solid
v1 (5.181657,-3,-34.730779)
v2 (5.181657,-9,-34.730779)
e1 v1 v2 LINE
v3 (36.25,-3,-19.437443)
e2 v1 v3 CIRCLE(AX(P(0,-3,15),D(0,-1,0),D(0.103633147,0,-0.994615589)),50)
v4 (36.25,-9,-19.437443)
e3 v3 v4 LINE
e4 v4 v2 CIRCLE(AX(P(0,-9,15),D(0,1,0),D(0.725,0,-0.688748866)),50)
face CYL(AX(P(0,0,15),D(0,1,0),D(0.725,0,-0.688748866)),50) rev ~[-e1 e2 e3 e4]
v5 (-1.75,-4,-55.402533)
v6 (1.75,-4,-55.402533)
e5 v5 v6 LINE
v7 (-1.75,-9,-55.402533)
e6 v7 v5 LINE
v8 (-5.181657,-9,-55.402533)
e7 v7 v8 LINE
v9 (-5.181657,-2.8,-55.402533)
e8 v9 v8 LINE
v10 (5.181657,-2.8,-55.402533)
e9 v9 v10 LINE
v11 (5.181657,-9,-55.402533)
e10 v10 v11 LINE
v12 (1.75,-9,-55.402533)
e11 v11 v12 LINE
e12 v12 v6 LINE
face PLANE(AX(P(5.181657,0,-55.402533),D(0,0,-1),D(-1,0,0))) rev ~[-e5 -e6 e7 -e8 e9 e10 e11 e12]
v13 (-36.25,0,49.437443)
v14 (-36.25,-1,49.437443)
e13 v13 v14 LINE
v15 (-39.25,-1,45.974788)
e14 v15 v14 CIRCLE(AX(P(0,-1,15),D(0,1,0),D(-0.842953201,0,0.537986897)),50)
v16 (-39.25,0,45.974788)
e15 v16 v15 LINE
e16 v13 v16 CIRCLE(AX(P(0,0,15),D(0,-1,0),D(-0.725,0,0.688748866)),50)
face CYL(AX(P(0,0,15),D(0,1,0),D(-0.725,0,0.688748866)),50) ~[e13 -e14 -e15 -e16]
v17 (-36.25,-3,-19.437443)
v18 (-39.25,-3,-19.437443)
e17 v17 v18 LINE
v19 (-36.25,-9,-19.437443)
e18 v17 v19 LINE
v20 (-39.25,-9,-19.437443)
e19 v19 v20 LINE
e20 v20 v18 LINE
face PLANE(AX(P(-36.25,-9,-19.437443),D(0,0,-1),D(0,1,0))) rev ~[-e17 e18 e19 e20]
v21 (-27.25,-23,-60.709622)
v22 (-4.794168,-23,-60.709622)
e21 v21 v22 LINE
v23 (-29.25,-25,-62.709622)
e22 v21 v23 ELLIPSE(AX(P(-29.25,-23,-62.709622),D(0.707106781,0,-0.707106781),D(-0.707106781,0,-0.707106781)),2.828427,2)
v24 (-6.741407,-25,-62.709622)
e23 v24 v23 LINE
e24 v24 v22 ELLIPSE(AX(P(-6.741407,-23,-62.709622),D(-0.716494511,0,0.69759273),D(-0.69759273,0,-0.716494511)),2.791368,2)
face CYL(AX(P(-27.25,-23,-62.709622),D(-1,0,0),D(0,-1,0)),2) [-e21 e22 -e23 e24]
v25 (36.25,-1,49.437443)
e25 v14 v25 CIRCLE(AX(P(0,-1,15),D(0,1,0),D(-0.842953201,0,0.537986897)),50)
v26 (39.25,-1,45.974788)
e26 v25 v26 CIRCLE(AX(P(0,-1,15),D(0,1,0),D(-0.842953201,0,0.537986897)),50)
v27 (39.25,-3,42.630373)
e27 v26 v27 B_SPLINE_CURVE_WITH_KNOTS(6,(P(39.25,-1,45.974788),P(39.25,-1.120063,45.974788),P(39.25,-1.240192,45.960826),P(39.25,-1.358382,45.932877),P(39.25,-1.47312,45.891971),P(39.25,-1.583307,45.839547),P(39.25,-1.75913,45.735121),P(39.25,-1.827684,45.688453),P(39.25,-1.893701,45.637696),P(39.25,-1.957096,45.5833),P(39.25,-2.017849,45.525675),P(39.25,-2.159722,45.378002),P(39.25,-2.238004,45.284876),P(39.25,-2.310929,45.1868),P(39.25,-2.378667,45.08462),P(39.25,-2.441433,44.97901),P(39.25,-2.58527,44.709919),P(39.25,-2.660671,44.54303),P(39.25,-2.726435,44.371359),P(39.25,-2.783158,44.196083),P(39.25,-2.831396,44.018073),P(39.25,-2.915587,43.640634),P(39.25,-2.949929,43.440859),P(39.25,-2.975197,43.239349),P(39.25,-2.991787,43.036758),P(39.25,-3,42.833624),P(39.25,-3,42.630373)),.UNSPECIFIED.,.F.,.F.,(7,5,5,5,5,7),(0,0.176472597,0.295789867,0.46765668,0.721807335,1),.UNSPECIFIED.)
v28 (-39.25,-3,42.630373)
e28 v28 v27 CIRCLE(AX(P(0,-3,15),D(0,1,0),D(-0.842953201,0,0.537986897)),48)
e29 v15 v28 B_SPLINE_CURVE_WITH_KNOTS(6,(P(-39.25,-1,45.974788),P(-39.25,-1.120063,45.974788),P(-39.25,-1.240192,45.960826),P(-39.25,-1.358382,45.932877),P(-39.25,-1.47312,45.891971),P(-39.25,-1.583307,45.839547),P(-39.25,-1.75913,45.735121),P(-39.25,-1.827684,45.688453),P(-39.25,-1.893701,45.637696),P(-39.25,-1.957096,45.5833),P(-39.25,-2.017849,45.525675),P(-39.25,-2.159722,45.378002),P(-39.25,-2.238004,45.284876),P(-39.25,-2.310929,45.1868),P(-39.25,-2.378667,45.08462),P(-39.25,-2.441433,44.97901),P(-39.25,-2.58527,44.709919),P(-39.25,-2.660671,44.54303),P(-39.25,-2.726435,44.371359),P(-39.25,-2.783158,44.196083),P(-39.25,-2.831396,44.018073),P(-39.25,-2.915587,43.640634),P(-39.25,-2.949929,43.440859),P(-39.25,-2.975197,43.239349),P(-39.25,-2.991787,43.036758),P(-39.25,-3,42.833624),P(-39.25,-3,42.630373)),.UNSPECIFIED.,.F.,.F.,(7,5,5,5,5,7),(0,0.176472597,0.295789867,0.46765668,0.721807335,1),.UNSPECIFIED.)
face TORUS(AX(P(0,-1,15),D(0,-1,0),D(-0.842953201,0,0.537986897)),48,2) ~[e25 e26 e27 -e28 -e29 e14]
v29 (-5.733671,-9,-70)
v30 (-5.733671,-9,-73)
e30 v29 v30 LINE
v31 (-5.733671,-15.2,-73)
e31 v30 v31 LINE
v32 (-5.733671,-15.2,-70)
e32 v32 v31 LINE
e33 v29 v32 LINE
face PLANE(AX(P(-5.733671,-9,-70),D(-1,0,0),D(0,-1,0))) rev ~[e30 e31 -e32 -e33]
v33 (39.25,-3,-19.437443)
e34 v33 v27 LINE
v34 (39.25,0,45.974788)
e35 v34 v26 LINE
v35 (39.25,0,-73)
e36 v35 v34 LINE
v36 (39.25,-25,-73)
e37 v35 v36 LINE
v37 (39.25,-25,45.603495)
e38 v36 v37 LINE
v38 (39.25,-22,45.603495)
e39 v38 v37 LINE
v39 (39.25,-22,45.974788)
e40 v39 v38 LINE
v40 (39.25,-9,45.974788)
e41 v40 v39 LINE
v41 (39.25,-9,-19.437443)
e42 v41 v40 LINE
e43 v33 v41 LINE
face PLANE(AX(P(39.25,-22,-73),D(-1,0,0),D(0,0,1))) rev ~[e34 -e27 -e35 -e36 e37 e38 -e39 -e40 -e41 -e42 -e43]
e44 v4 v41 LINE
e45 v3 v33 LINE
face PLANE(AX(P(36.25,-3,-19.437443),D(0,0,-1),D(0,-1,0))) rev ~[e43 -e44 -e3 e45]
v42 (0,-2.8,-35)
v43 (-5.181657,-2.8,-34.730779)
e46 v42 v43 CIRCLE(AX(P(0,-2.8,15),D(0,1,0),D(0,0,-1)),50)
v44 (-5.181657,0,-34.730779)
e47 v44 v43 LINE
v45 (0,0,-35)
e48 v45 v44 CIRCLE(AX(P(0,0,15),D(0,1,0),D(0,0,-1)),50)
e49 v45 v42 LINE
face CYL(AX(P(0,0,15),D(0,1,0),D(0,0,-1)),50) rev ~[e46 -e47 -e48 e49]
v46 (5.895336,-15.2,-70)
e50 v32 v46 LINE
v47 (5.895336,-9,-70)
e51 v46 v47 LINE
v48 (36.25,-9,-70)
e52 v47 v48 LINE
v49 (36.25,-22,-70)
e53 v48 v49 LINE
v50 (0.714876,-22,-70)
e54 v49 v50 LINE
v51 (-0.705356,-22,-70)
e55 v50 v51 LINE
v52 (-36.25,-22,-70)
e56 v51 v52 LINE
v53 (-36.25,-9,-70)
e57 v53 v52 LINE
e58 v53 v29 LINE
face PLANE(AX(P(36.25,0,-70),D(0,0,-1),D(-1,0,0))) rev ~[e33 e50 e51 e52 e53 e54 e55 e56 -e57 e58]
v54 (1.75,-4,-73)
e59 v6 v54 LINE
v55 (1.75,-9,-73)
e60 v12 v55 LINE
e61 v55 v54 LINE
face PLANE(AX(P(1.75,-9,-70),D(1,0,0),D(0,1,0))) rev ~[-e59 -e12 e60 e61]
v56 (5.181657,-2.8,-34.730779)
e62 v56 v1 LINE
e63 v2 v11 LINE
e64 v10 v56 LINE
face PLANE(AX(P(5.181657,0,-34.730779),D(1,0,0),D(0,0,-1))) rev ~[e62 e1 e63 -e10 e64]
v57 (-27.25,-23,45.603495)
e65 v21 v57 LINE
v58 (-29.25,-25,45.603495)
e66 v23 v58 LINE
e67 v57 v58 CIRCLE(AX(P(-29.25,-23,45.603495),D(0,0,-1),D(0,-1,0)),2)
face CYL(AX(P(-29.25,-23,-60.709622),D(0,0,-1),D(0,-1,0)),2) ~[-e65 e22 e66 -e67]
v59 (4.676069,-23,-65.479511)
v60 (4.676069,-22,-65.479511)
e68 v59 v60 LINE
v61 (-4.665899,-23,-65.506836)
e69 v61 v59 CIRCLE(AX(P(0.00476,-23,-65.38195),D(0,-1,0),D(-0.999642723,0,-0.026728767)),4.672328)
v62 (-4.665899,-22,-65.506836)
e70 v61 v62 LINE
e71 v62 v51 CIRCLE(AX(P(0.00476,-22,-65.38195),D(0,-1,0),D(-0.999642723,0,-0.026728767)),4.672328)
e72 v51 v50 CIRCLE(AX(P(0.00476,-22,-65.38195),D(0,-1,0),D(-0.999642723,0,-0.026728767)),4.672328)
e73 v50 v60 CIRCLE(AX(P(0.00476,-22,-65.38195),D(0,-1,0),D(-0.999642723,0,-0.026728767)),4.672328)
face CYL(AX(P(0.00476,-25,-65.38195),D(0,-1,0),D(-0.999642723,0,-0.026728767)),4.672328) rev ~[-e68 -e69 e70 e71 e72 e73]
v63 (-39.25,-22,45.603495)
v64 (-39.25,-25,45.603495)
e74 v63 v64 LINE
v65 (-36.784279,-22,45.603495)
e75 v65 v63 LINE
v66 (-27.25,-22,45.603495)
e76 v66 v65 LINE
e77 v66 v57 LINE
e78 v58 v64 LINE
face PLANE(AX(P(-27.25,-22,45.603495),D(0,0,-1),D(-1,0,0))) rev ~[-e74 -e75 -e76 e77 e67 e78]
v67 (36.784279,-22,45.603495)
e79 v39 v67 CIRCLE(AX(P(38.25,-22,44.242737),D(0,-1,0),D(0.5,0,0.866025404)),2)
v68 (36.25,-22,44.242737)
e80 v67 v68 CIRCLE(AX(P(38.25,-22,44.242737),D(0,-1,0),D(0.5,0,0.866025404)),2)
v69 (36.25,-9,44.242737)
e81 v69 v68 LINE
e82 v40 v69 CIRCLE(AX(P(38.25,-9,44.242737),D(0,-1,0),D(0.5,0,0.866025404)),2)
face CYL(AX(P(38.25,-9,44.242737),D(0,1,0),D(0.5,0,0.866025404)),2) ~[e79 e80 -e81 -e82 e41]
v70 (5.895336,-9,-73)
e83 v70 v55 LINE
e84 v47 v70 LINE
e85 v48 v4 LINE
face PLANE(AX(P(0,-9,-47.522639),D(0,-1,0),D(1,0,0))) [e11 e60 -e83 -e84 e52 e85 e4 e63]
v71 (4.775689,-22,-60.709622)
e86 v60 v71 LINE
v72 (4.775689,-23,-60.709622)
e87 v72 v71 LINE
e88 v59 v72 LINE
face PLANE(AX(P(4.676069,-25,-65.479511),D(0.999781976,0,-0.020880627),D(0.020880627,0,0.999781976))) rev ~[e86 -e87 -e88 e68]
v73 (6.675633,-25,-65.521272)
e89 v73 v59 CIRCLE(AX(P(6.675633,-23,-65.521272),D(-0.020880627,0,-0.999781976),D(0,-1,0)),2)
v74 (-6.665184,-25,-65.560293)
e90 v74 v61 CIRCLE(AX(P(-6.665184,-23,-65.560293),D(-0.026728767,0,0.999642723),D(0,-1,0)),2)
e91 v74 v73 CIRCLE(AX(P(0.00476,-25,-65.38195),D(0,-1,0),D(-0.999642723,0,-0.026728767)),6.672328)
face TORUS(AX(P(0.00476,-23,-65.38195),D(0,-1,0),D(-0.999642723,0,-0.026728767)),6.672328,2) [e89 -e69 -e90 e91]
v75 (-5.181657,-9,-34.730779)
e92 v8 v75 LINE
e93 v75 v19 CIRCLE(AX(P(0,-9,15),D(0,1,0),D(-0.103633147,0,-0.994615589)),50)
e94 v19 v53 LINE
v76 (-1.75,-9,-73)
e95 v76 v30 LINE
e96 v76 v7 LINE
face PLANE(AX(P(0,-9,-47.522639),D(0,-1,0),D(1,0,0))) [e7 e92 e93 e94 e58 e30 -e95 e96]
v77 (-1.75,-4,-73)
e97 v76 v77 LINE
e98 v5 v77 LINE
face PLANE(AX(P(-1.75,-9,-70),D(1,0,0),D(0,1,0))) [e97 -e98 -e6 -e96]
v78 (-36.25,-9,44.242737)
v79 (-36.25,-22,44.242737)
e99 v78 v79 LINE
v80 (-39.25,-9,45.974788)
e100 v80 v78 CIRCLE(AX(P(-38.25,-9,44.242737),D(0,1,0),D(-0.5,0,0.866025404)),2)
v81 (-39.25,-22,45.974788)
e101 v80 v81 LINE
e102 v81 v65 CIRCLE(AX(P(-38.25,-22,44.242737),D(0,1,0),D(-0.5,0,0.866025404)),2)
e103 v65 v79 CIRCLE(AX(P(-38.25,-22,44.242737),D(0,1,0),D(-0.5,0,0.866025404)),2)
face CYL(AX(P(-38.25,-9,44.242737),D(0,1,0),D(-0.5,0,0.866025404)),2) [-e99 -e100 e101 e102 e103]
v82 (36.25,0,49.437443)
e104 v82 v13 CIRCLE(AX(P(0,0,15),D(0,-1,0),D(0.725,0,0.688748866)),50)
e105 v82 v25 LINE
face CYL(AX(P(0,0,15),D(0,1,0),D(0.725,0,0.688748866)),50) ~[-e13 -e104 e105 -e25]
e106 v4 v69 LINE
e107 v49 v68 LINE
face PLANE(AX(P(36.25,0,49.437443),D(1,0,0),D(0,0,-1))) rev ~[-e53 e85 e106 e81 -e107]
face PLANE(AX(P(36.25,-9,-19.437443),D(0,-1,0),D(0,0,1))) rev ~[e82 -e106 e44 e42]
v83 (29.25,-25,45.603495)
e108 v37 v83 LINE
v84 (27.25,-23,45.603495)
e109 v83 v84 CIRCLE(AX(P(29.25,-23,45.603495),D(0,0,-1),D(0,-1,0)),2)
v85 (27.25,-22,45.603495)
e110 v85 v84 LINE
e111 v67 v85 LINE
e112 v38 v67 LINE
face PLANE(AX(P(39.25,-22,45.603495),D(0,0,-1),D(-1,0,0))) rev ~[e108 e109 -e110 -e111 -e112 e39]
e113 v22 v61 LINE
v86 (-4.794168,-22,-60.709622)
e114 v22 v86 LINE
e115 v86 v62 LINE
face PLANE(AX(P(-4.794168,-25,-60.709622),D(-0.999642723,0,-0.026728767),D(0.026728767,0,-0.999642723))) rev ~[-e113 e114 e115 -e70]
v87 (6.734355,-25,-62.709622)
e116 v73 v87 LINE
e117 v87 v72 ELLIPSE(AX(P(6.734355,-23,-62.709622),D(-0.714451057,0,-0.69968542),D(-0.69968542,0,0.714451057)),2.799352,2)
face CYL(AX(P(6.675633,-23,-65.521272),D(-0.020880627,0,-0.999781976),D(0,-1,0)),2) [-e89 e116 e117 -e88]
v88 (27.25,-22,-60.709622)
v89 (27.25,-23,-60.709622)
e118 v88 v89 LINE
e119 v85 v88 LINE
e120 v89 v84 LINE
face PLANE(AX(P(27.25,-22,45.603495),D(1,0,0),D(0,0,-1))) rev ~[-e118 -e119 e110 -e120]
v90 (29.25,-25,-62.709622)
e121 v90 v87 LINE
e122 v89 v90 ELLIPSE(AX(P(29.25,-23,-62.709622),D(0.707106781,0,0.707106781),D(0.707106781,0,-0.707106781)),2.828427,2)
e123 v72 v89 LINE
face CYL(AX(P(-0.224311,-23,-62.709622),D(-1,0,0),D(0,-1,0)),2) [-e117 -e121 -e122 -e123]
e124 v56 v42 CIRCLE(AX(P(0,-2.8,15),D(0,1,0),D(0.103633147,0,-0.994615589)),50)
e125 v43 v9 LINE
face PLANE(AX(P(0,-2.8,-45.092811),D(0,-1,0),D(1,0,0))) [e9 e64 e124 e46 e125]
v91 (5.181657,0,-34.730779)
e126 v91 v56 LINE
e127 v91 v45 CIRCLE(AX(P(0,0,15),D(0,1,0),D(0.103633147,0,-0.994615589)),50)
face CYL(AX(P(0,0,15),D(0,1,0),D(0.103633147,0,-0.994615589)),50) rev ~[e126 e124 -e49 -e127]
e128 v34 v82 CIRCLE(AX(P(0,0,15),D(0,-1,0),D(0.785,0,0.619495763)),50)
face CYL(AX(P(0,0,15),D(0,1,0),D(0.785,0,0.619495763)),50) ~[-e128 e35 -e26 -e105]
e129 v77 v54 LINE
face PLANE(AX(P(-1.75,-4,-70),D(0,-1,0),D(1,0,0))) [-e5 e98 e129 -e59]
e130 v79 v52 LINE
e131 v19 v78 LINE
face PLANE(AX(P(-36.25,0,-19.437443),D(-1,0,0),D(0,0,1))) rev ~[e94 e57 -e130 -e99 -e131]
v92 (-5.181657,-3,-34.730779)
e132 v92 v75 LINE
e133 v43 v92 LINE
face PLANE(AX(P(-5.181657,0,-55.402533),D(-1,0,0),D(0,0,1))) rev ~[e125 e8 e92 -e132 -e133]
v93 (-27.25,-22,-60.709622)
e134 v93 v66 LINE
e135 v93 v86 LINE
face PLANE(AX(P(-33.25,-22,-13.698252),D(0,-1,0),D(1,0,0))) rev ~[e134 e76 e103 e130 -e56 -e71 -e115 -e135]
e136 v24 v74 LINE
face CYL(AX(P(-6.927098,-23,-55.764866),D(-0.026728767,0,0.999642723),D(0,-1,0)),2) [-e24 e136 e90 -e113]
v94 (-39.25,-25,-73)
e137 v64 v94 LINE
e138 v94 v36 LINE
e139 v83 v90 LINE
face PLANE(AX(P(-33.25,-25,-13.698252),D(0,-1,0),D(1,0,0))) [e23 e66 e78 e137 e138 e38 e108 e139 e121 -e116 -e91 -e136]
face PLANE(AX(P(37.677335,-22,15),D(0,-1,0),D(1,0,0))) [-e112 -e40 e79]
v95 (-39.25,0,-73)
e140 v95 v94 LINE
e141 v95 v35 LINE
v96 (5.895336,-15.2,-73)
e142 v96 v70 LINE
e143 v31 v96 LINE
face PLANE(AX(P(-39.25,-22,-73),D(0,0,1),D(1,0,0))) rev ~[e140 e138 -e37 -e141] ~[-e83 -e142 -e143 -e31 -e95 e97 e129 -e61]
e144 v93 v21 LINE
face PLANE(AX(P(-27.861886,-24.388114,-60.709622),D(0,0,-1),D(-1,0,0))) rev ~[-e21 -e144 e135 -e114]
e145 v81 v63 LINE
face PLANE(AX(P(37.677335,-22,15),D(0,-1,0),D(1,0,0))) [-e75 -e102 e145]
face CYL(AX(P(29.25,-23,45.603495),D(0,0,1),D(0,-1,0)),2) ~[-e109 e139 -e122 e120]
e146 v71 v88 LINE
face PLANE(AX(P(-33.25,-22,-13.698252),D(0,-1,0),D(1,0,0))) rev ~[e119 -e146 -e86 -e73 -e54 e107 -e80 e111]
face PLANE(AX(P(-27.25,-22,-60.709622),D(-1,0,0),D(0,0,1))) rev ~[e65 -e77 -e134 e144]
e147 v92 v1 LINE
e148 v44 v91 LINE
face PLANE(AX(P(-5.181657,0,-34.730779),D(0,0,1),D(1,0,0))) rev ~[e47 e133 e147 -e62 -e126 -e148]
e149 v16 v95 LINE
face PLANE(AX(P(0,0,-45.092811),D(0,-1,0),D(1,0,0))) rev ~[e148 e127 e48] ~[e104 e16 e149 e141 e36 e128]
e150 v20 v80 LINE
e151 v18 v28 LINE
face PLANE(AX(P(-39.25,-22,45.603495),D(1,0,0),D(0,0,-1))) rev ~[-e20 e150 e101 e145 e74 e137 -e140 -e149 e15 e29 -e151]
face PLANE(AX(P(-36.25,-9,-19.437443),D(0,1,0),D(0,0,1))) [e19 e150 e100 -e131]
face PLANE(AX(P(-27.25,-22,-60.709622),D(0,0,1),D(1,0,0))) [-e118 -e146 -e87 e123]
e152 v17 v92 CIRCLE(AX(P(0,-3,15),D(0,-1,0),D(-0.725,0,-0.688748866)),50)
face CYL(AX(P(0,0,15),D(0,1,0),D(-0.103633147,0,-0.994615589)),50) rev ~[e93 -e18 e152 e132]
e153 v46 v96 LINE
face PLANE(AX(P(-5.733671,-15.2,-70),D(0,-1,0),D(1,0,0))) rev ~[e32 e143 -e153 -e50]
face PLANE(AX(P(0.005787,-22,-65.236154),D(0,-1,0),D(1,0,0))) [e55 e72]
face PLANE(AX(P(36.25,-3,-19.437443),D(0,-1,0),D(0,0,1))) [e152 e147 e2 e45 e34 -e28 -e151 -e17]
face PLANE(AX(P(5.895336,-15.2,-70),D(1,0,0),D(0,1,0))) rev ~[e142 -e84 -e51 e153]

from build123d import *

# Parameters (mm, degrees)
F1_DEPTH      = 3
F2_DEPTH      = 9
F3_DEPTH      = 22
F4_DEPTH      = 22
F5_DEPTH      = 22
F6_W          = 6
F6_H          = 68.8748865698
F7_DEPTH      = 4
F8_W          = 6
F8_H          = 68.8748865698
F9_DEPTH      = 4
F10_DEPTH     = 2.8
F11_W         = 3.5
F11_H         = 14.5974665339
F12_DEPTH     = 5
F14_DEPTH     = 4
F15_DEPTH     = 4
F16_W         = 54.5
F16_H         = 12.2903782427
F17_DEPTH     = 3
F19_DEPTH     = 3
F20_T1_DEPTH  = 111.3131168485
F20_T3_DEPTH  = 27.4743105508
F20_T5_DEPTH  = 27.4558316657
F20_T7_DEPTH  = 9.7989282925
F20_T9_DEPTH  = 13
F20_T11_DEPTH = 9.7709294909
F20_T14_ANGLE = 114.906593859
F20_T16_ANGLE = 177.2719132967
F20_T21_DEPTH = 111.3131168485
F20_T25_DEPTH = 32.4558316657
F20_T32_DEPTH = 32.4743105508
F20_T36_DEPTH = 111.3131168485


# Not quite as in the source:
# - a fillet or chamfer that OpenCascade refuses, or shapes differently, is made with other operations: its cross-section is extruded or revolved along the edge and cut away or added


with BuildPart() as f1:
    # F0 (on Front) → F1 (new body)
    with BuildSketch(Plane.XZ):
        with BuildLine():
            Line((36.25, -19.4374432849), (36.25, 49.4374432849))
            ThreePointArc((36.25, 49.4374432849), (0, 65), (-36.25, 49.4374432849))
            Line((-36.25, 49.4374432849), (-36.25, -19.4374432849))
            ThreePointArc((-36.25, -19.4374432849), (-22.0820535862, -29.8595910527), (-5.1816573471, -34.7307794745))
            Line((-5.1816573471, -34.7307794745), (5.1816573471, -34.7307794745))
            ThreePointArc((5.1816573471, -34.7307794745), (22.0820535862, -29.8595910527), (36.25, -19.4374432849))
        make_face()
    extrude(amount=F1_DEPTH)

    # F0 (on Front) → F2 (join)
    with BuildSketch(Plane.XZ):
        with BuildLine():
            Line((36.25, -70), (36.25, -19.4374432849))
            ThreePointArc((36.25, -19.4374432849), (22.0820535862, -29.8595910527), (5.1816573471, -34.7307794745))
            Line((5.1816573471, -34.7307794745), (5.1816573471, -55.4025334661))
            Line((5.1816573471, -55.4025334661), (-5.1816573471, -55.4025334661))
            Line((-5.1816573471, -55.4025334661), (-5.1816573471, -34.7307794745))
            ThreePointArc((-5.1816573471, -34.7307794745), (-22.0820535862, -29.8595910527), (-36.25, -19.4374432849))
            Line((-36.25, -19.4374432849), (-36.25, -70))
            Line((-36.25, -70), (36.25, -70))
        make_face()
    extrude(amount=F2_DEPTH)

    # F0 (on Front) → F3 (join)
    with BuildSketch(Plane.XZ):
        with BuildLine():
            ThreePointArc((39.25, -15.9747881349), (37.7896810673, -17.7404948776), (36.25, -19.4374432849))
            Line((36.25, -19.4374432849), (36.25, -70))
            Line((36.25, -70), (-36.25, -70))
            Line((-36.25, -70), (-36.25, -19.4374432849))
            ThreePointArc((-36.25, -19.4374432849), (-37.7896810674, -17.7404948776), (-39.25, -15.9747881349))
            Line((-39.25, -15.9747881349), (-39.25, -73))
            Line((-39.25, -73), (39.25, -73))
            Line((39.25, -73), (39.25, -15.9747881349))
        make_face()
    extrude(amount=F3_DEPTH)

    # F0 (on Front) → F4 (join)
    with BuildSketch(Plane.XZ):
        with BuildLine():
            Line((-36.25, -19.4374432849), (-36.25, 49.4374432849))
            ThreePointArc((-36.25, 49.4374432849), (-37.7896810673, 47.7404948776), (-39.25, 45.9747881349))
            Line((-39.25, 45.9747881349), (-39.25, -15.9747881349))
            ThreePointArc((-39.25, -15.9747881349), (-37.7896810674, -17.7404948776), (-36.25, -19.4374432849))
        make_face()
    extrude(amount=F4_DEPTH)

    # F0 (on Front) → F5 (join)
    with BuildSketch(Plane.XZ):
        with BuildLine():
            ThreePointArc((39.25, 45.9747881349), (37.7896810673, 47.7404948776), (36.25, 49.4374432849))
            Line((36.25, 49.4374432849), (36.25, -19.4374432849))
            ThreePointArc((36.25, -19.4374432849), (37.7896810673, -17.7404948776), (39.25, -15.9747881349))
            Line((39.25, -15.9747881349), (39.25, 45.9747881349))
        make_face()
    extrude(amount=F5_DEPTH)

    # F6 (on face) → F7 (cut)
    with BuildSketch(Plane.YZ.offset(-36.25)):
        with Locations((-6, 15)):
            Rectangle(F6_W, F6_H)
    extrude(amount=-F7_DEPTH, mode=Mode.SUBTRACT)

    # F8 (on face) → F9 (cut)
    with BuildSketch(Plane(origin=(36.25, 0, 0), x_dir=(0, -1, 0), z_dir=(-1, 0, 0))):
        with Locations((6, 15)):
            Rectangle(F8_W, F8_H)
    extrude(amount=-F9_DEPTH, mode=Mode.SUBTRACT)

    # F0 (on Front) → F10 (join)
    with BuildSketch(Plane.XZ):
        with BuildLine():
            Line((5.1816573471, -55.4025334661), (5.1816573471, -34.7307794745))
            ThreePointArc((5.1816573471, -34.7307794745), (2.5943232525, -34.9326495077), (0, -35))
            ThreePointArc((0, -35), (-2.5943232525, -34.9326495077), (-5.1816573471, -34.7307794745))
            Line((-5.1816573471, -34.7307794745), (-5.1816573471, -55.4025334661))
            Line((-5.1816573471, -55.4025334661), (5.1816573471, -55.4025334661))
        make_face()
    extrude(amount=F10_DEPTH)

    # F11 (on face) → F12 (cut)
    with BuildSketch(Plane.XZ.offset(9)):
        with Locations((0, -62.7012667331)):
            Rectangle(F11_W, F11_H)
    extrude(amount=-F12_DEPTH, mode=Mode.SUBTRACT)

    # F13 (on face) → F14 (cut)
    with BuildSketch(Plane.XY.offset(-70)):
        Polygon((-1.75, -9), (-5.7336706668, -9), (-5.7336706668, -15.2), (5.8953360592, -15.2), (5.8953360592, -9), (1.75, -9), align=None)
    extrude(amount=-F14_DEPTH, mode=Mode.SUBTRACT)

    # F15 (cut): a face of the model
    f15_faces = [f1.faces().sort_by_distance(p)[0] for p in [
        (0, -6.5, -70),
    ]]
    extrude(f15_faces, amount=-F15_DEPTH, mode=Mode.SUBTRACT)

    # F16 (on face) → F17 (join)
    with BuildSketch(Plane.XZ.offset(22)):
        Polygon((-39.25, 45.6034950912), (-39.25, -73), (-27.25, -73), (-27.25, -60.7096217573), (-27.25, 45.6034950912), align=None)
        with Locations((0, -66.8548108786)):
            Rectangle(F16_W, F16_H)
        Polygon((27.25, -60.7096217573), (27.25, -73), (39.25, -73), (39.25, 45.6034950912), (27.25, 45.6034950912), align=None)
    extrude(amount=F17_DEPTH)

    # F18 (on face) → F19 (cut)
    with BuildSketch(Plane.XZ.offset(25)):
        with BuildLine():
            ThreePointArc((0.0047599162, -60.7096217573), (-3.3429375433, -62.1225677813), (-4.6658988973, -65.5068355016))
            ThreePointArc((-4.6658988973, -65.5068355016), (0.0184260463, -70.0542581163), (4.6760694509, -65.4795110707))
            ThreePointArc((4.6760694509, -65.4795110707), (4.6768334539, -65.4307331593), (4.6770881308, -65.3819499298))
            ThreePointArc((4.6770881308, -65.3819499298), (3.3085948781, -62.0781149802), (0.0047599162, -60.7096217573))
        make_face()
        with BuildLine():
            ThreePointArc((4.6770881308, -65.3819499298), (4.6768334539, -65.4307331593), (4.6760694509, -65.4795110707))
            Line((4.6760694509, -65.4795110707), (4.7756894492, -60.7096217573))
            Line((4.7756894492, -60.7096217573), (0.0047599162, -60.7096217573))
            ThreePointArc((0.0047599162, -60.7096217573), (3.3085948781, -62.0781149802), (4.6770881308, -65.3819499298))
        make_face()
        with BuildLine():
            Line((-4.7941683343, -60.7096217573), (-4.6658988973, -65.5068355016))
            ThreePointArc((-4.6658988973, -65.5068355016), (-3.3429375433, -62.1225677813), (0.0047599162, -60.7096217573))
            Line((0.0047599162, -60.7096217573), (-4.7941683343, -60.7096217573))
        make_face()
    extrude(amount=-F19_DEPTH, mode=Mode.SUBTRACT)

    # F20: fillet of radius 2 on 10 edges, made by hand

    # F20_s2 → F20_t1 (cut)
    with BuildSketch(Plane.XY.offset(-60.7096217573)):
        with BuildLine():
            ThreePointArc((-29.25, -25), (-27.8357864376, -24.4142135624), (-27.25, -23))
            Line((-27.25, -23), (-27.25, -25))
            Line((-27.25, -25), (-29.25, -25))
        make_face()
        with BuildLine():
            ThreePointArc((29.25, -25), (27.8357864376, -24.4142135624), (27.25, -23))
            Line((27.25, -23), (27.25, -25))
            Line((27.25, -25), (29.25, -25))
        make_face()
    extrude(amount=F20_T1_DEPTH, mode=Mode.SUBTRACT)

    # F20_s4 → F20_t3 (cut)
    with BuildSketch(Plane.YZ.offset(-0.2243105508)):
        with BuildLine():
            ThreePointArc((-25, -62.7096217573), (-24.4142135624, -61.2954081949), (-23, -60.7096217573))
            Line((-23, -60.7096217573), (-25, -60.7096217573))
            Line((-25, -60.7096217573), (-25, -62.7096217573))
        make_face()
    extrude(amount=F20_T3_DEPTH, mode=Mode.SUBTRACT)

    # F20_s6 → F20_t5 (cut)
    with BuildSketch(Plane.YZ.offset(-27.25)):
        with BuildLine():
            ThreePointArc((-25, -62.7096217573), (-24.4142135624, -61.2954081949), (-23, -60.7096217573))
            Line((-23, -60.7096217573), (-25, -60.7096217573))
            Line((-25, -60.7096217573), (-25, -62.7096217573))
        make_face()
    extrude(amount=F20_T5_DEPTH, mode=Mode.SUBTRACT)

    # F20_s8 → F20_t7 (cut)
    with BuildSketch(Plane(origin=(1.4850446734, 0, -55.5399391245), x_dir=(0, 1, 0), z_dir=(0.0267287672, 0, -0.9996427227))):
        with BuildLine():
            ThreePointArc((-25, -8.4151488306), (-24.4142135624, -7.0009352682), (-23, -6.4151488306))
            Line((-23, -6.4151488306), (-25, -6.4151488306))
            Line((-25, -6.4151488306), (-25, -8.4151488306))
        make_face()
    extrude(amount=F20_T7_DEPTH, mode=Mode.SUBTRACT)

    # F20_s10 → F20_t9 (cut)
    with BuildSketch(Plane.XZ.offset(9)):
        with BuildLine():
            ThreePointArc((39.25, 45.9747881349), (37.25, 45.9747881349), (36.25, 44.2427373273))
            Line((36.25, 44.2427373273), (36.25, 49.4374432849))
            ThreePointArc((36.25, 49.4374432849), (37.7896810673, 47.7404948776), (39.25, 45.9747881349))
        make_face()
        with BuildLine():
            ThreePointArc((-39.25, 45.9747881349), (-37.25, 45.9747881349), (-36.25, 44.2427373273))
            Line((-36.25, 44.2427373273), (-36.25, 49.4374432849))
            ThreePointArc((-36.25, 49.4374432849), (-37.7896810673, 47.7404948776), (-39.25, 45.9747881349))
        make_face()
    extrude(amount=F20_T9_DEPTH, mode=Mode.SUBTRACT)

    # F20_s12 → F20_t11 (cut)
    with BuildSketch(Plane(origin=(-1.3649163722, 0, -65.3533439927), x_dir=(0, 1, 0), z_dir=(0.0208806268, 0, 0.9997819759))):
        with BuildLine():
            ThreePointArc((-25, -8.0423031905), (-24.4142135624, -6.6280896281), (-23, -6.0423031905))
            Line((-23, -6.0423031905), (-25, -6.0423031905))
            Line((-25, -6.0423031905), (-25, -8.0423031905))
        make_face()
    extrude(amount=F20_T11_DEPTH, mode=Mode.SUBTRACT)

    # F20_s13 → F20_t14 (revolve, cut)
    with BuildSketch(Plane(origin=(6.8024666518, 0, 10.65855148), x_dir=(0, 1, 0), z_dir=(-0.537986897, 0, -0.8429532008))):
        with BuildLine():
            ThreePointArc((-1, -58.0698034549), (-2.4142135624, -57.4840170172), (-3, -56.0698034549))
            Line((-3, -56.0698034549), (-3, -58.0698034549))
            Line((-3, -58.0698034549), (-1, -58.0698034549))
        make_face()
    revolve(axis=Axis((0, -3, 15), (0, 1, 0)), revolution_arc=F20_T14_ANGLE, mode=Mode.SUBTRACT)

    # F20_s15 → F20_t16 (revolve, cut)
    with BuildSketch(Plane(origin=(1.746957946, 0, -65.3353664822), x_dir=(0, 1, 0), z_dir=(-0.0267287672, 0, 0.9996427227))):
        with BuildLine():
            ThreePointArc((-25, 8.4151488306), (-24.4142135624, 7.0009352682), (-23, 6.4151488306))
            Line((-23, 6.4151488306), (-25, 6.4151488306))
            Line((-25, 6.4151488306), (-25, 8.4151488306))
        make_face()
    revolve(axis=Axis((0.0047599583, -25, -65.3819499298), (0, -1, 0)), revolution_arc=F20_T16_ANGLE, mode=Mode.SUBTRACT)


with BuildPart() as f20_tool19:
    # F20_s20 → F20_t21 (new body)
    with BuildSketch(Plane.XY.offset(-65.7096217573)):
        with BuildLine():
            ThreePointArc((-29.25, -25), (-27.8357864376, -24.4142135624), (-27.25, -23))
            Line((-27.25, -23), (-27.25, -25))
            Line((-27.25, -25), (-29.25, -25))
        make_face()
    extrude(amount=F20_T21_DEPTH)

    split(bisect_by=Plane.XY.offset(-60.7096217573), keep=Keep.BOTTOM)


with BuildPart() as f20_tool23:
    # F20_s24 → F20_t25 (new body)
    with BuildSketch(Plane.YZ.offset(0.2058316657)):
        with BuildLine():
            ThreePointArc((-25, -62.7096217573), (-24.4142135624, -61.2954081949), (-23, -60.7096217573))
            Line((-23, -60.7096217573), (-25, -60.7096217573))
            Line((-25, -60.7096217573), (-25, -62.7096217573))
        make_face()
    extrude(amount=-F20_T25_DEPTH)

    split(bisect_by=Plane.YZ.offset(-27.25), keep=Keep.BOTTOM)


with BuildPart() as f20_tool19_1:
    add(f20_tool19.part)

    # F20_t27: intersect F20_tool23
    add(f20_tool23.part, mode=Mode.INTERSECT)


with BuildPart() as f1_1:
    add(f1.part)

    # F20_t17: cut F20_tool19
    add(f20_tool19_1.part, mode=Mode.SUBTRACT)


with BuildPart() as f20_tool30:
    # F20_s31 → F20_t32 (new body)
    with BuildSketch(Plane.YZ.offset(32.25)):
        with BuildLine():
            ThreePointArc((-25, -62.7096217573), (-24.4142135624, -61.2954081949), (-23, -60.7096217573))
            Line((-23, -60.7096217573), (-25, -60.7096217573))
            Line((-25, -60.7096217573), (-25, -62.7096217573))
        make_face()
    extrude(amount=-F20_T32_DEPTH)

    split(bisect_by=Plane.YZ.offset(27.25), keep=Keep.TOP)


with BuildPart() as f20_tool34:
    # F20_s35 → F20_t36 (new body)
    with BuildSketch(Plane.XY.offset(45.6034950912)):
        with BuildLine():
            ThreePointArc((29.25, -25), (27.8357864376, -24.4142135624), (27.25, -23))
            Line((27.25, -23), (27.25, -25))
            Line((27.25, -25), (29.25, -25))
        make_face()
    extrude(amount=-F20_T36_DEPTH)

    split(bisect_by=Plane.XY.offset(-60.7096217573), keep=Keep.BOTTOM)


with BuildPart() as f20_tool30_1:
    add(f20_tool30.part)

    # F20_t38: intersect F20_tool34
    add(f20_tool34.part, mode=Mode.INTERSECT)


with BuildPart() as f1_2:
    add(f1_1.part)

    # F20_t28: cut F20_tool30
    add(f20_tool30_1.part, mode=Mode.SUBTRACT)


solid = f1_2.part
